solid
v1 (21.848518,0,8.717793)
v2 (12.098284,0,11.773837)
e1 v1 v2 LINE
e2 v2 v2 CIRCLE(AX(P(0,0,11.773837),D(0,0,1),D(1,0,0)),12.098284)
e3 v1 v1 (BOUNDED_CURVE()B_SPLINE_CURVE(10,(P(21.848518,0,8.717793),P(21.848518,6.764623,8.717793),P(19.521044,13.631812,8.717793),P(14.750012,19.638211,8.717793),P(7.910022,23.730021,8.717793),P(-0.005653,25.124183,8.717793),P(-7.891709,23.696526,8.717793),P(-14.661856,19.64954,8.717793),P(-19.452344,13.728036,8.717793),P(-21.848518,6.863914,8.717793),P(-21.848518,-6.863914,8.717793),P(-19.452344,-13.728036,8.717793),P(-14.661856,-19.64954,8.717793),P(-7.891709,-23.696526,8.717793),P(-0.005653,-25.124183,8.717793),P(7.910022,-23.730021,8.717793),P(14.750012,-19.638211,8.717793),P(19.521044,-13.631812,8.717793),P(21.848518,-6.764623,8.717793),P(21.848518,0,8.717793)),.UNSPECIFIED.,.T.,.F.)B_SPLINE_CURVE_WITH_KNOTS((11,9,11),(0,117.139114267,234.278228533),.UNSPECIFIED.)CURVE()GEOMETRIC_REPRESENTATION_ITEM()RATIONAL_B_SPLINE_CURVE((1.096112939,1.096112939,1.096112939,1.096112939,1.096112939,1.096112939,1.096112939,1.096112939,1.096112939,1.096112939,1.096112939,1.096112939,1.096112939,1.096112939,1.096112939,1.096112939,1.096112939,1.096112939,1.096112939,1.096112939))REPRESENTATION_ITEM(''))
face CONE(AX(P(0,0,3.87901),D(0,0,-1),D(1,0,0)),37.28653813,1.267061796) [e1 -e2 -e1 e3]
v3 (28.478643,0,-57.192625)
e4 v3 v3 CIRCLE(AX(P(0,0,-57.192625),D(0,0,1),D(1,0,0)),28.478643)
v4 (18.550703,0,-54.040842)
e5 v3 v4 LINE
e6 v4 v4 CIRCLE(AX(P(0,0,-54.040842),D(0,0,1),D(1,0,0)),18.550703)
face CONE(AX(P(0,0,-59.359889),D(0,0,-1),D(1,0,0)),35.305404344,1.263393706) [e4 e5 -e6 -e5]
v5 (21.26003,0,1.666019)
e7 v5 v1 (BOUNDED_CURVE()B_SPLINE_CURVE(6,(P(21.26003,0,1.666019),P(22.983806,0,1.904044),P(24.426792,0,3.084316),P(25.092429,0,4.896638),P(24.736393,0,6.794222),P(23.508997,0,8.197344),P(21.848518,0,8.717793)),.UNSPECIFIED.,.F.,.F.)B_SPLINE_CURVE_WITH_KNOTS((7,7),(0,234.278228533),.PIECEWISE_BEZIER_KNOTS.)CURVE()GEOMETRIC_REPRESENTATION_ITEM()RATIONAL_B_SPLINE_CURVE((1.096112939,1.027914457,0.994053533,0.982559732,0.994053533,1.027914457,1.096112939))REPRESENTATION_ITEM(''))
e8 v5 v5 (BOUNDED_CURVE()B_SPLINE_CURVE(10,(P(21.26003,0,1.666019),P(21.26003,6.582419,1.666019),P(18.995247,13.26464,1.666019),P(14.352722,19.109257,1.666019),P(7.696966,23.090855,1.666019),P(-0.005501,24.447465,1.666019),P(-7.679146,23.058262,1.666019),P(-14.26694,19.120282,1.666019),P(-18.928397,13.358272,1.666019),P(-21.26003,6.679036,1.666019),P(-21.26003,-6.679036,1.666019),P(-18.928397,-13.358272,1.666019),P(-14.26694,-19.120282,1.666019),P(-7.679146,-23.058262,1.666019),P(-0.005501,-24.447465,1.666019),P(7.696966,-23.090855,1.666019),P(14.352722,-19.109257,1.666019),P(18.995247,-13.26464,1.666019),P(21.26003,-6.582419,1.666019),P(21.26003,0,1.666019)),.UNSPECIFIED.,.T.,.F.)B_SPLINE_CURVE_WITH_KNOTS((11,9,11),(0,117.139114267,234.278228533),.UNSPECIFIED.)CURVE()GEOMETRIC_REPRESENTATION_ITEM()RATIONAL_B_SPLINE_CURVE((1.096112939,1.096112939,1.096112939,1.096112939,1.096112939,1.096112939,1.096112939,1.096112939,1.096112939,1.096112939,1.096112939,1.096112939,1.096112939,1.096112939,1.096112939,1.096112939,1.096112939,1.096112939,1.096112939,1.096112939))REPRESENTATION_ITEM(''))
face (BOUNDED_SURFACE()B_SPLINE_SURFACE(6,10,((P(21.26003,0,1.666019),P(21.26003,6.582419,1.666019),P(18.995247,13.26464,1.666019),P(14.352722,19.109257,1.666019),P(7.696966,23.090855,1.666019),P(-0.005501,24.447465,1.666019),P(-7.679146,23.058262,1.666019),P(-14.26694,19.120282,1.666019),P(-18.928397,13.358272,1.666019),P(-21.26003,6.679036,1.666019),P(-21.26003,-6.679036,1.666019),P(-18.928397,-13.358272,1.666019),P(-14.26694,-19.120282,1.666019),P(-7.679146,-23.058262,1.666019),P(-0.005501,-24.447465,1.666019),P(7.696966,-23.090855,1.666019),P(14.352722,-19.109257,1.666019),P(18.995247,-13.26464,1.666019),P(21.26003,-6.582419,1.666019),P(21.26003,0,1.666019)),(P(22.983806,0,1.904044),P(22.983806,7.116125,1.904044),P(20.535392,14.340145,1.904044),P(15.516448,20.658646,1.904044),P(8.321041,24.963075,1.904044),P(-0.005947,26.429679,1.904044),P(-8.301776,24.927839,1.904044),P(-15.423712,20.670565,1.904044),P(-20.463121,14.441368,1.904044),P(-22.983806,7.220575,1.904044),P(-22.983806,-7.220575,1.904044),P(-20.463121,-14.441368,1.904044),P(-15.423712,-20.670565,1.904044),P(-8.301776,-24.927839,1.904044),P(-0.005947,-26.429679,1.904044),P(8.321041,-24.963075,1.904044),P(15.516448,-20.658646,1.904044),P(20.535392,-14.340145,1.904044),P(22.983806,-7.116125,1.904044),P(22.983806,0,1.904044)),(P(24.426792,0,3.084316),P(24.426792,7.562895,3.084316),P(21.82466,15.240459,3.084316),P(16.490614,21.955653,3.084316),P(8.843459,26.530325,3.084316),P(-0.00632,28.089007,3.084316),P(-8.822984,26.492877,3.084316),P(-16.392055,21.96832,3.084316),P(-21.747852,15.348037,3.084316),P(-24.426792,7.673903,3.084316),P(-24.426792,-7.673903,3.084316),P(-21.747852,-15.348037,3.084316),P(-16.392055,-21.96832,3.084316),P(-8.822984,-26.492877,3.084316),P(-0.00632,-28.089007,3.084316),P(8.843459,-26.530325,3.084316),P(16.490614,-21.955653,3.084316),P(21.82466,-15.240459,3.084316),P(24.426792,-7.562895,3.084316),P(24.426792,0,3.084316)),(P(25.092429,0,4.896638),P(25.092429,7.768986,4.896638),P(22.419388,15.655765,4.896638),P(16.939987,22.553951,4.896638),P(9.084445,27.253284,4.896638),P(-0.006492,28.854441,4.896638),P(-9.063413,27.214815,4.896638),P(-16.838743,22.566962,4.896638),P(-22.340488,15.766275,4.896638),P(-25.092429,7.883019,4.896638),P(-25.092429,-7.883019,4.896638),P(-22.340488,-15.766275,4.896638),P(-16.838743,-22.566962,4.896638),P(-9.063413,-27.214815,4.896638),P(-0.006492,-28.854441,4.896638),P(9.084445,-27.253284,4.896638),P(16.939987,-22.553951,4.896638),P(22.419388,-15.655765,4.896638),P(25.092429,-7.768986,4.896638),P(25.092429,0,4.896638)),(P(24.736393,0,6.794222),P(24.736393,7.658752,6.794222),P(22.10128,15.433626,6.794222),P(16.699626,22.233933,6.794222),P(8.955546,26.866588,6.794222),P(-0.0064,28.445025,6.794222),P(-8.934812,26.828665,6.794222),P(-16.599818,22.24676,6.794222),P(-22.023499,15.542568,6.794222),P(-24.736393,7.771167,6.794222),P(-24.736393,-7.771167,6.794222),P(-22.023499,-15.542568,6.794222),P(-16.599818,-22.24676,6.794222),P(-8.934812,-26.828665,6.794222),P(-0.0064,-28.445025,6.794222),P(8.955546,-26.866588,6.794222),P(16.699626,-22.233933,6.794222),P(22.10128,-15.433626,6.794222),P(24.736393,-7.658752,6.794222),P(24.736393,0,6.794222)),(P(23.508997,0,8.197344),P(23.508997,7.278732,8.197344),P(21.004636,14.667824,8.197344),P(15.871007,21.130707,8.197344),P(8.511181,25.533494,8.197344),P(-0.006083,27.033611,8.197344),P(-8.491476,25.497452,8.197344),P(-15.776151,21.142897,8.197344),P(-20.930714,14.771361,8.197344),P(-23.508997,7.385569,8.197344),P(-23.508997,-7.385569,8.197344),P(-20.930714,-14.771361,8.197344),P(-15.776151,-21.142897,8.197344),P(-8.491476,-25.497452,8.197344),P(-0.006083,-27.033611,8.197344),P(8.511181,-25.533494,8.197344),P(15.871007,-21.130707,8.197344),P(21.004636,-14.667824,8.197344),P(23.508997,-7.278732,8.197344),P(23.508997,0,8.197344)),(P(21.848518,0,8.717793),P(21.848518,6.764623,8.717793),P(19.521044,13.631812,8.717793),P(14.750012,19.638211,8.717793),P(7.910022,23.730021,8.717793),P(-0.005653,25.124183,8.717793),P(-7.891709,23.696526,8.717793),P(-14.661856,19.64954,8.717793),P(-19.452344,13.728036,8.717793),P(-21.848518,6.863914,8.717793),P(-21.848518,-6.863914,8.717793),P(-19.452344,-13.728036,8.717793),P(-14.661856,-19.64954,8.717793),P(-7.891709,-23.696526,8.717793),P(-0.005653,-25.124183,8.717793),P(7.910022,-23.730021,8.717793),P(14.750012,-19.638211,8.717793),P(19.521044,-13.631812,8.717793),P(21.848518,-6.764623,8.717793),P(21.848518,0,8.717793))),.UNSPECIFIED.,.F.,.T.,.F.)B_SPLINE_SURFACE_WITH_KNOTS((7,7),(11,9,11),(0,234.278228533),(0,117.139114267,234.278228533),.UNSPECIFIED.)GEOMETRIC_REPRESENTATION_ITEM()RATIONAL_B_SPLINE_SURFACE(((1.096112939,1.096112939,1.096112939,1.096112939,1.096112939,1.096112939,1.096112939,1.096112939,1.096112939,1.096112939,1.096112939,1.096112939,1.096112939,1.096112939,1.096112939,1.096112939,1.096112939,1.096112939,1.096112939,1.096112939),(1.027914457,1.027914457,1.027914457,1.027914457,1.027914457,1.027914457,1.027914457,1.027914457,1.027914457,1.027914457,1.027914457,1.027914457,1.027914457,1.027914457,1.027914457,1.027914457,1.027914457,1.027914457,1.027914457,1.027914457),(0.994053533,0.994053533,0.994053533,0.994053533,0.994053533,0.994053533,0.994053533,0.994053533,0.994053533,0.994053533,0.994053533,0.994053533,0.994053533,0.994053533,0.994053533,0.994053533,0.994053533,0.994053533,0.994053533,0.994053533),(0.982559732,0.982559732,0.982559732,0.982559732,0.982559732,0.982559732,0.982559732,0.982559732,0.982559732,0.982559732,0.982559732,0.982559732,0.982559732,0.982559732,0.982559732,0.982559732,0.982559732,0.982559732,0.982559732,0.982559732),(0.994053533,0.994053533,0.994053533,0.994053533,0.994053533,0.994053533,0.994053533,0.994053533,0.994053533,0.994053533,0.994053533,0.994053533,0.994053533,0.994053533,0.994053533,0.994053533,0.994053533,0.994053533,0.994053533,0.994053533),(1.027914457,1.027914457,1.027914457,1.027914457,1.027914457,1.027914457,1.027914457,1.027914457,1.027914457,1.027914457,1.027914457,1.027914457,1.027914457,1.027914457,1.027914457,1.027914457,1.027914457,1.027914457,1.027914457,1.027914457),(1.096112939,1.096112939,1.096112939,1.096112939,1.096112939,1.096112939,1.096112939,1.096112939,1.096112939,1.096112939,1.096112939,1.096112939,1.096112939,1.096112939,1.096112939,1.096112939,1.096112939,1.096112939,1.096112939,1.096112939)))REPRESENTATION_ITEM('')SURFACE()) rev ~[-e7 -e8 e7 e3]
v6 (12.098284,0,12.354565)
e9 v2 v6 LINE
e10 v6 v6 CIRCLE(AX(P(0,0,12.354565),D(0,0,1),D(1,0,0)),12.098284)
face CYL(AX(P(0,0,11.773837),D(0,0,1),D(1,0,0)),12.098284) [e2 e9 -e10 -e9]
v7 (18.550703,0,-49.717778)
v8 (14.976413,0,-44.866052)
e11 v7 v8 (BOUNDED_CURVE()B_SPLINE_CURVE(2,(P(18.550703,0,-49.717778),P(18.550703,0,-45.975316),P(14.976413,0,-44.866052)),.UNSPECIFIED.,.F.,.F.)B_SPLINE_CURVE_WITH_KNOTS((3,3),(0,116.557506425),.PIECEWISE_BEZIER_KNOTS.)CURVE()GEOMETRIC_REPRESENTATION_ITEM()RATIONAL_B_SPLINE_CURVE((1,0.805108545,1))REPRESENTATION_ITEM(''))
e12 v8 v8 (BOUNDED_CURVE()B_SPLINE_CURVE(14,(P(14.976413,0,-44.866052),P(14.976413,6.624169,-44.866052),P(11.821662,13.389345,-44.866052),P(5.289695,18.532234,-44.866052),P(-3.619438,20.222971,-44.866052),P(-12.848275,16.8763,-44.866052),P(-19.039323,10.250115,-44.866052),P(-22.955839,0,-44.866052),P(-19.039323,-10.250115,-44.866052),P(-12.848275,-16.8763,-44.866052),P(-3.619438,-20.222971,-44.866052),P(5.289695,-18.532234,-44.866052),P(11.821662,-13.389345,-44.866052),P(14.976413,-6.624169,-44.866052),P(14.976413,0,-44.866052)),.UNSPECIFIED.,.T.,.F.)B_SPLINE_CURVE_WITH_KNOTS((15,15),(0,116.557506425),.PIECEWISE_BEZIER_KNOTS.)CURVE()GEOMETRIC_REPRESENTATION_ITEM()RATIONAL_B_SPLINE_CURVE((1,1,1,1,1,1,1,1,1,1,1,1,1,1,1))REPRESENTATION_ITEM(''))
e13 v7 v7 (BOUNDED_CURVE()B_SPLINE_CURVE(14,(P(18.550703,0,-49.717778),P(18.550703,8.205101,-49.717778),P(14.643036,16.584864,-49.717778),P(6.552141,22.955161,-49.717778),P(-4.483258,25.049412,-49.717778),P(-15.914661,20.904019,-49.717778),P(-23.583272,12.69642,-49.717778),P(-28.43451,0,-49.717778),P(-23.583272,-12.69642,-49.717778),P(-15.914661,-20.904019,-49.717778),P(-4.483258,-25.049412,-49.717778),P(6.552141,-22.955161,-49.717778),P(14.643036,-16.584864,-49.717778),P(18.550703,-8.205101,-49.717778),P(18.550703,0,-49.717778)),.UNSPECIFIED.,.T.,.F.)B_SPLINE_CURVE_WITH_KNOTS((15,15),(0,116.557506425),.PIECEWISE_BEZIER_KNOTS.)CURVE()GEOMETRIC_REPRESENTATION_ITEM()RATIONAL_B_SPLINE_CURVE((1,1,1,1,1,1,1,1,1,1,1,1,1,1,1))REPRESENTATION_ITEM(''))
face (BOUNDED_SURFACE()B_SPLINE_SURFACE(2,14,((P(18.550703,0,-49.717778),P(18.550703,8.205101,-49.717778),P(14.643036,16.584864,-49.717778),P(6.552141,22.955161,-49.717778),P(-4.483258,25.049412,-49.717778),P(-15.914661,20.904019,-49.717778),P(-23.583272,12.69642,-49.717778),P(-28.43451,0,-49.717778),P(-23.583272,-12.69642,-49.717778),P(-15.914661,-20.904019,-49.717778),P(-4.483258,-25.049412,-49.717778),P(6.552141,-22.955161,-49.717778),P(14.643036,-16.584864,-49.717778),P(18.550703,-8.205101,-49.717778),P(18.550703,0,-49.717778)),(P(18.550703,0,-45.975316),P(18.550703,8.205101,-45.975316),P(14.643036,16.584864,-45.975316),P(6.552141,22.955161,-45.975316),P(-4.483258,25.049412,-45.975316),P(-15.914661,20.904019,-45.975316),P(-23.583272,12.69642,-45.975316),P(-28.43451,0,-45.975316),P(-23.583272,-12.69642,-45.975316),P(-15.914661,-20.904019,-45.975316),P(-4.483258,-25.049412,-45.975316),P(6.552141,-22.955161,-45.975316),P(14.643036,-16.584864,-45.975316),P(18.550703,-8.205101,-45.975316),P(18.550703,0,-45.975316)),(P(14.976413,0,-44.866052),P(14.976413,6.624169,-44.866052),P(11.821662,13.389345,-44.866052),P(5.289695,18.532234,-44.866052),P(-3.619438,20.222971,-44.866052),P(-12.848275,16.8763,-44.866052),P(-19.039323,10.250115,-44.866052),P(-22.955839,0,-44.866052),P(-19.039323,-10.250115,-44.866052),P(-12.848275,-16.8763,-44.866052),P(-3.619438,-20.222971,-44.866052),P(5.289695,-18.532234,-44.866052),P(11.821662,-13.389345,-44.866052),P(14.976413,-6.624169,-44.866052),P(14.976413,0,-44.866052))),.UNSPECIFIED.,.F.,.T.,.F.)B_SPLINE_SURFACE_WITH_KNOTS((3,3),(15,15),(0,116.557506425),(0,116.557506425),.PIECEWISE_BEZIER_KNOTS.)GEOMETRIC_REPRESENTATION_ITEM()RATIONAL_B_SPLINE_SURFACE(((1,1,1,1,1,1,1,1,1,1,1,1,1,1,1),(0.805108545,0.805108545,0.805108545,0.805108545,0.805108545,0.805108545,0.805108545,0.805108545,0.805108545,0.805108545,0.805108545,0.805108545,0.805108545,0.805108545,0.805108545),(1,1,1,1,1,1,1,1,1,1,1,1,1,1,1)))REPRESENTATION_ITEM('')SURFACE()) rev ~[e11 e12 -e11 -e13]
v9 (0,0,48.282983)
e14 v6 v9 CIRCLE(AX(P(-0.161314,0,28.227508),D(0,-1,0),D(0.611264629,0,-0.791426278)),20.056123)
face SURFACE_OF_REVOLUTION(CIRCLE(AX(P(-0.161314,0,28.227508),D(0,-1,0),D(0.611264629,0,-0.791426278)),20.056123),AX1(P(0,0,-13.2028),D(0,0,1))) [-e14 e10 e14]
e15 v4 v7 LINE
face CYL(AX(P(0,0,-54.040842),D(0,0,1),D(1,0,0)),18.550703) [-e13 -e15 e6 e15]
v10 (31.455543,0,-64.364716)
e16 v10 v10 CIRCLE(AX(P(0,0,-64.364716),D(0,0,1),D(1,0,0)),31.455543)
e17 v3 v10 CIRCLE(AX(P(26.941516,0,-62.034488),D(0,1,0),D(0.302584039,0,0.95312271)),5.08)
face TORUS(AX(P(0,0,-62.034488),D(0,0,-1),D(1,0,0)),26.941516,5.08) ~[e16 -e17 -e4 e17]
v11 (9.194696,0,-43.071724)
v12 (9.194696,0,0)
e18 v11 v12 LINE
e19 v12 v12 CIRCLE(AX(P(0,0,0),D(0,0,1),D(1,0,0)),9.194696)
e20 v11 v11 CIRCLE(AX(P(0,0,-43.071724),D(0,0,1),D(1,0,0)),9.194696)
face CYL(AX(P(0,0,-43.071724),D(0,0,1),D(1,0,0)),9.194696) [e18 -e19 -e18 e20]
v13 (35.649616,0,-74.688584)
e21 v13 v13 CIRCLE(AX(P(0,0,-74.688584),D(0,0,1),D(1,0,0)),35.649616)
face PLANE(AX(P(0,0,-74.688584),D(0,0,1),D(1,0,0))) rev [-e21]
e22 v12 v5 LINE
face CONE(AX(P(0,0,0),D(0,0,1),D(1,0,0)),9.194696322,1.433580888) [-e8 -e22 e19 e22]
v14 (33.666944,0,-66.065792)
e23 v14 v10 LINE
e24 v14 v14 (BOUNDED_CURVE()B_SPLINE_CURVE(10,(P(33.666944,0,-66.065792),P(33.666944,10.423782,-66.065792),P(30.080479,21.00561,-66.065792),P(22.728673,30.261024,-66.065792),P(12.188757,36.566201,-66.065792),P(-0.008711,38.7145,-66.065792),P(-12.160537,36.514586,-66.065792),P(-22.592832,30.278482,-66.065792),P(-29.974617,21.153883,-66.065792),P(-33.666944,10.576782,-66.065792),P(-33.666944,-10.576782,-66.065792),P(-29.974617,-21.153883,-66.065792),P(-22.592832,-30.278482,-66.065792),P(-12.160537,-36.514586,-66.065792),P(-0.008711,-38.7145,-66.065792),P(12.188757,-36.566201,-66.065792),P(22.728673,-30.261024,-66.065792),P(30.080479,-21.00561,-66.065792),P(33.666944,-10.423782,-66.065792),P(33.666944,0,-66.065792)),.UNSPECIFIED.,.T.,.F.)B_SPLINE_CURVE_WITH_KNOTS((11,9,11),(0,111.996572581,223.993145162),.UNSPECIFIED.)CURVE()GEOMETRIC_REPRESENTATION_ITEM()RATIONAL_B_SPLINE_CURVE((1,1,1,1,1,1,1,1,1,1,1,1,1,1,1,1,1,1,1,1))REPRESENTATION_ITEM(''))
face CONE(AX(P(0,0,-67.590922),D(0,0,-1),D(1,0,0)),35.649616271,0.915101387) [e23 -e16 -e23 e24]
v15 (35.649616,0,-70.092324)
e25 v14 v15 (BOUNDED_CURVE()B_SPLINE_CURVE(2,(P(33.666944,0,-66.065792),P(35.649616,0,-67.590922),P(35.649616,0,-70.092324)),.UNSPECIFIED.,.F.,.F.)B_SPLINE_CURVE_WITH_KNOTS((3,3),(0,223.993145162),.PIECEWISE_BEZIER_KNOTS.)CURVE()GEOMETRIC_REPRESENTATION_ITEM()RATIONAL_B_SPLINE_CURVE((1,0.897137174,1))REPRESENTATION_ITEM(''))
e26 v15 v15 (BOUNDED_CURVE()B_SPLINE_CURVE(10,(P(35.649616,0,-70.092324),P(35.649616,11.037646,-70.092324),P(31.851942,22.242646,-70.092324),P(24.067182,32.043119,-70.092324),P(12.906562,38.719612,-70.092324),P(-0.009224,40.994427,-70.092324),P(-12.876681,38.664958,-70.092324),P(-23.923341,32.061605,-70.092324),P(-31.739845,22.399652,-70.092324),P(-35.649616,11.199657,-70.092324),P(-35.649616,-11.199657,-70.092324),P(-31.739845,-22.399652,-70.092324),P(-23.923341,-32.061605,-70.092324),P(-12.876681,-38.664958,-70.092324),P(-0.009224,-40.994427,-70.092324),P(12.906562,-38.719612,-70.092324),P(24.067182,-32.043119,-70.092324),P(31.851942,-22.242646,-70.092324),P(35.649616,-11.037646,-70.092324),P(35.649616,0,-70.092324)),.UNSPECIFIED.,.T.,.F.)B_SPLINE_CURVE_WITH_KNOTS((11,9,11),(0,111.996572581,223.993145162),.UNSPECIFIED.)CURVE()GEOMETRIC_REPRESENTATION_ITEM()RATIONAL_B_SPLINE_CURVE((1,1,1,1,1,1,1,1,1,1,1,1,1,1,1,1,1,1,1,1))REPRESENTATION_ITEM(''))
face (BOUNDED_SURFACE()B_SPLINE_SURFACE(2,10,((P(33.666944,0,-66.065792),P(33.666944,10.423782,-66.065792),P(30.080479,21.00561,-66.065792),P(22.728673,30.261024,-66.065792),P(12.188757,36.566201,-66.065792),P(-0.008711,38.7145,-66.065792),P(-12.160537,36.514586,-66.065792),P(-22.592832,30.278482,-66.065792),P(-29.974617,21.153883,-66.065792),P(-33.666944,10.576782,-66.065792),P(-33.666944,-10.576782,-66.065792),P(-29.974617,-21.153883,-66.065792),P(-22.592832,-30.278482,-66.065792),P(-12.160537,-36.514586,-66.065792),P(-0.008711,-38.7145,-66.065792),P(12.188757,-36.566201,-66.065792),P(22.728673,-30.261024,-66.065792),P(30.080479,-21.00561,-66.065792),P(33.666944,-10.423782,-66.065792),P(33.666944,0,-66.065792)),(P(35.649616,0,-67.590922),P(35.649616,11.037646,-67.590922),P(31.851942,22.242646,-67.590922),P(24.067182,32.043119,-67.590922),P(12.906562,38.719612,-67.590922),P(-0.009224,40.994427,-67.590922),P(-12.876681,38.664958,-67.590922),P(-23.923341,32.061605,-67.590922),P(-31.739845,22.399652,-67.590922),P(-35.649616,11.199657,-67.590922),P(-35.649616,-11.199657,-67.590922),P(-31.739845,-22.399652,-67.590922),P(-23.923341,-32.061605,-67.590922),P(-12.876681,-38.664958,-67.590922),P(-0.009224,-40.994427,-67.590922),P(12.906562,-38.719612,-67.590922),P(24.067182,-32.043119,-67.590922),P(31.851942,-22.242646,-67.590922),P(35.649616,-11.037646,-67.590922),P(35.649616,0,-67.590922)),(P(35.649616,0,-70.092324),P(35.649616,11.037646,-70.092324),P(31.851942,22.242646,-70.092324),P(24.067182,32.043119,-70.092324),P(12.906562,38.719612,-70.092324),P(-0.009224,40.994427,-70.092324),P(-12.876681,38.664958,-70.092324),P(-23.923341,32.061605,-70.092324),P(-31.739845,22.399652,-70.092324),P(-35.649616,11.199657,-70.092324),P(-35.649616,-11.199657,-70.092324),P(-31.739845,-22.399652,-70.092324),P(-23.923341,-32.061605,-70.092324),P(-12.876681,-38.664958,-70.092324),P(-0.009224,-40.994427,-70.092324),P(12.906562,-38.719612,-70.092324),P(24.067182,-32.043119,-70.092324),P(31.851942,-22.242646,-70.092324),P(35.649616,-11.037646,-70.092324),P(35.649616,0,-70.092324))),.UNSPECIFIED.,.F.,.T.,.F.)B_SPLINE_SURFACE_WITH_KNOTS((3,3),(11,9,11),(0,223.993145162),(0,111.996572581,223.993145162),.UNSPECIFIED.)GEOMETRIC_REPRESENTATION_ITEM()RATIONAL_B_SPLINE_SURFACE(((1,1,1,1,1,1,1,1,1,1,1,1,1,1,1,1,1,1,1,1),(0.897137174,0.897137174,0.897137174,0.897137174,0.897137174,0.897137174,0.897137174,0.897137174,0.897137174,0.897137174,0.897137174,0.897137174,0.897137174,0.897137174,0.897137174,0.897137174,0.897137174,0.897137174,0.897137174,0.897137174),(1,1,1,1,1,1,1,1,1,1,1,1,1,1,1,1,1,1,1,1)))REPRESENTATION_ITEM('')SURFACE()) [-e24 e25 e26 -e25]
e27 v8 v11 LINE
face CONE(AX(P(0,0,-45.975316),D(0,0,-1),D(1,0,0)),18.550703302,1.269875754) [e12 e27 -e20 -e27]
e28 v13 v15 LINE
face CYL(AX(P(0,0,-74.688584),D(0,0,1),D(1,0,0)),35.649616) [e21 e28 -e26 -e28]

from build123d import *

# Parameters (mm, degrees)
F2_R = 3.6259131904
F4_R = 5.08
F5_R = 5.08


# Not quite as in the source:
# - a fillet or chamfer that OpenCascade refuses, or shapes differently, is made with other operations: its cross-section is extruded or revolved along the edge and cut away or added


with BuildPart() as f1:
    # F0 (on Front) → F1 (revolve)
    with BuildSketch(Plane.XZ):
        with BuildLine():
            Line((0, -74.6885836124), (35.6496162713, -74.6885836124))
            Line((35.6496162713, -74.6885836124), (35.6496162713, -67.5909221172))
            Line((35.6496162713, -67.5909221172), (31.4555428922, -64.3647164106))
            Line((31.4555428922, -64.3647164106), (35.3054043443, -59.3598894102))
            Line((35.3054043443, -59.3598894102), (18.550703302, -54.0408417583))
            Line((18.550703302, -54.0408417583), (18.550703302, -45.9753163159))
            Line((18.550703302, -45.9753163159), (9.1946963221, -43.0717244744))
            Line((9.1946963221, -43.0717244744), (9.1946963221, 0))
            Line((9.1946963221, 0), (37.2865381299, 3.8790097637))
            Line((37.2865381299, 3.8790097637), (12.0982844383, 11.773836799))
            Line((12.0982844383, 11.773836799), (12.0982844383, 12.354565))
            ThreePointArc((12.0982844383, 12.354565), (18.8461202348, 34.6279388467), (0, 48.2829826967))
            Line((0, 48.2829826967), (0, -74.6885836124))
        make_face()
    revolve(axis=Axis((0, 0, -13.2028004579), (0, 0, 1)))

    # F2
    f2_edges = [f1.edges().sort_by_distance(p)[0] for p in [
        (-37.286538, 0, 3.87901),
    ]]
    fillet(f2_edges, radius=F2_R)

    # F3: fillet of radius 5.08 on 1 edges, made by hand

    # F3_s1 → F3_t2 (revolve, cut)
    with BuildSketch(Plane.XZ):
        with BuildLine():
            ThreePointArc((28.4786431175, -57.1926249402), (31.6334069722, -60.0870384375), (31.4555428922, -64.3647164106))
            Line((31.4555428922, -64.3647164106), (35.3054043443, -59.3598894102))
            Line((35.3054043443, -59.3598894102), (28.4786431175, -57.1926249402))
        make_face()
    revolve(axis=Axis((0, 0, -59.3598894102), (0, 0, 1)), mode=Mode.SUBTRACT)

    # F4
    f4_edges = [f1.edges().sort_by_distance(p)[0] for p in [
        (-35.649616, 0, -67.590922),
    ]]
    fillet(f4_edges, radius=F4_R)

    # F5
    f5_edges = [f1.edges().sort_by_distance(p)[0] for p in [
        (-18.550703, 0, -45.975316),
    ]]
    fillet(f5_edges, radius=F5_R)


solid = f1.part
